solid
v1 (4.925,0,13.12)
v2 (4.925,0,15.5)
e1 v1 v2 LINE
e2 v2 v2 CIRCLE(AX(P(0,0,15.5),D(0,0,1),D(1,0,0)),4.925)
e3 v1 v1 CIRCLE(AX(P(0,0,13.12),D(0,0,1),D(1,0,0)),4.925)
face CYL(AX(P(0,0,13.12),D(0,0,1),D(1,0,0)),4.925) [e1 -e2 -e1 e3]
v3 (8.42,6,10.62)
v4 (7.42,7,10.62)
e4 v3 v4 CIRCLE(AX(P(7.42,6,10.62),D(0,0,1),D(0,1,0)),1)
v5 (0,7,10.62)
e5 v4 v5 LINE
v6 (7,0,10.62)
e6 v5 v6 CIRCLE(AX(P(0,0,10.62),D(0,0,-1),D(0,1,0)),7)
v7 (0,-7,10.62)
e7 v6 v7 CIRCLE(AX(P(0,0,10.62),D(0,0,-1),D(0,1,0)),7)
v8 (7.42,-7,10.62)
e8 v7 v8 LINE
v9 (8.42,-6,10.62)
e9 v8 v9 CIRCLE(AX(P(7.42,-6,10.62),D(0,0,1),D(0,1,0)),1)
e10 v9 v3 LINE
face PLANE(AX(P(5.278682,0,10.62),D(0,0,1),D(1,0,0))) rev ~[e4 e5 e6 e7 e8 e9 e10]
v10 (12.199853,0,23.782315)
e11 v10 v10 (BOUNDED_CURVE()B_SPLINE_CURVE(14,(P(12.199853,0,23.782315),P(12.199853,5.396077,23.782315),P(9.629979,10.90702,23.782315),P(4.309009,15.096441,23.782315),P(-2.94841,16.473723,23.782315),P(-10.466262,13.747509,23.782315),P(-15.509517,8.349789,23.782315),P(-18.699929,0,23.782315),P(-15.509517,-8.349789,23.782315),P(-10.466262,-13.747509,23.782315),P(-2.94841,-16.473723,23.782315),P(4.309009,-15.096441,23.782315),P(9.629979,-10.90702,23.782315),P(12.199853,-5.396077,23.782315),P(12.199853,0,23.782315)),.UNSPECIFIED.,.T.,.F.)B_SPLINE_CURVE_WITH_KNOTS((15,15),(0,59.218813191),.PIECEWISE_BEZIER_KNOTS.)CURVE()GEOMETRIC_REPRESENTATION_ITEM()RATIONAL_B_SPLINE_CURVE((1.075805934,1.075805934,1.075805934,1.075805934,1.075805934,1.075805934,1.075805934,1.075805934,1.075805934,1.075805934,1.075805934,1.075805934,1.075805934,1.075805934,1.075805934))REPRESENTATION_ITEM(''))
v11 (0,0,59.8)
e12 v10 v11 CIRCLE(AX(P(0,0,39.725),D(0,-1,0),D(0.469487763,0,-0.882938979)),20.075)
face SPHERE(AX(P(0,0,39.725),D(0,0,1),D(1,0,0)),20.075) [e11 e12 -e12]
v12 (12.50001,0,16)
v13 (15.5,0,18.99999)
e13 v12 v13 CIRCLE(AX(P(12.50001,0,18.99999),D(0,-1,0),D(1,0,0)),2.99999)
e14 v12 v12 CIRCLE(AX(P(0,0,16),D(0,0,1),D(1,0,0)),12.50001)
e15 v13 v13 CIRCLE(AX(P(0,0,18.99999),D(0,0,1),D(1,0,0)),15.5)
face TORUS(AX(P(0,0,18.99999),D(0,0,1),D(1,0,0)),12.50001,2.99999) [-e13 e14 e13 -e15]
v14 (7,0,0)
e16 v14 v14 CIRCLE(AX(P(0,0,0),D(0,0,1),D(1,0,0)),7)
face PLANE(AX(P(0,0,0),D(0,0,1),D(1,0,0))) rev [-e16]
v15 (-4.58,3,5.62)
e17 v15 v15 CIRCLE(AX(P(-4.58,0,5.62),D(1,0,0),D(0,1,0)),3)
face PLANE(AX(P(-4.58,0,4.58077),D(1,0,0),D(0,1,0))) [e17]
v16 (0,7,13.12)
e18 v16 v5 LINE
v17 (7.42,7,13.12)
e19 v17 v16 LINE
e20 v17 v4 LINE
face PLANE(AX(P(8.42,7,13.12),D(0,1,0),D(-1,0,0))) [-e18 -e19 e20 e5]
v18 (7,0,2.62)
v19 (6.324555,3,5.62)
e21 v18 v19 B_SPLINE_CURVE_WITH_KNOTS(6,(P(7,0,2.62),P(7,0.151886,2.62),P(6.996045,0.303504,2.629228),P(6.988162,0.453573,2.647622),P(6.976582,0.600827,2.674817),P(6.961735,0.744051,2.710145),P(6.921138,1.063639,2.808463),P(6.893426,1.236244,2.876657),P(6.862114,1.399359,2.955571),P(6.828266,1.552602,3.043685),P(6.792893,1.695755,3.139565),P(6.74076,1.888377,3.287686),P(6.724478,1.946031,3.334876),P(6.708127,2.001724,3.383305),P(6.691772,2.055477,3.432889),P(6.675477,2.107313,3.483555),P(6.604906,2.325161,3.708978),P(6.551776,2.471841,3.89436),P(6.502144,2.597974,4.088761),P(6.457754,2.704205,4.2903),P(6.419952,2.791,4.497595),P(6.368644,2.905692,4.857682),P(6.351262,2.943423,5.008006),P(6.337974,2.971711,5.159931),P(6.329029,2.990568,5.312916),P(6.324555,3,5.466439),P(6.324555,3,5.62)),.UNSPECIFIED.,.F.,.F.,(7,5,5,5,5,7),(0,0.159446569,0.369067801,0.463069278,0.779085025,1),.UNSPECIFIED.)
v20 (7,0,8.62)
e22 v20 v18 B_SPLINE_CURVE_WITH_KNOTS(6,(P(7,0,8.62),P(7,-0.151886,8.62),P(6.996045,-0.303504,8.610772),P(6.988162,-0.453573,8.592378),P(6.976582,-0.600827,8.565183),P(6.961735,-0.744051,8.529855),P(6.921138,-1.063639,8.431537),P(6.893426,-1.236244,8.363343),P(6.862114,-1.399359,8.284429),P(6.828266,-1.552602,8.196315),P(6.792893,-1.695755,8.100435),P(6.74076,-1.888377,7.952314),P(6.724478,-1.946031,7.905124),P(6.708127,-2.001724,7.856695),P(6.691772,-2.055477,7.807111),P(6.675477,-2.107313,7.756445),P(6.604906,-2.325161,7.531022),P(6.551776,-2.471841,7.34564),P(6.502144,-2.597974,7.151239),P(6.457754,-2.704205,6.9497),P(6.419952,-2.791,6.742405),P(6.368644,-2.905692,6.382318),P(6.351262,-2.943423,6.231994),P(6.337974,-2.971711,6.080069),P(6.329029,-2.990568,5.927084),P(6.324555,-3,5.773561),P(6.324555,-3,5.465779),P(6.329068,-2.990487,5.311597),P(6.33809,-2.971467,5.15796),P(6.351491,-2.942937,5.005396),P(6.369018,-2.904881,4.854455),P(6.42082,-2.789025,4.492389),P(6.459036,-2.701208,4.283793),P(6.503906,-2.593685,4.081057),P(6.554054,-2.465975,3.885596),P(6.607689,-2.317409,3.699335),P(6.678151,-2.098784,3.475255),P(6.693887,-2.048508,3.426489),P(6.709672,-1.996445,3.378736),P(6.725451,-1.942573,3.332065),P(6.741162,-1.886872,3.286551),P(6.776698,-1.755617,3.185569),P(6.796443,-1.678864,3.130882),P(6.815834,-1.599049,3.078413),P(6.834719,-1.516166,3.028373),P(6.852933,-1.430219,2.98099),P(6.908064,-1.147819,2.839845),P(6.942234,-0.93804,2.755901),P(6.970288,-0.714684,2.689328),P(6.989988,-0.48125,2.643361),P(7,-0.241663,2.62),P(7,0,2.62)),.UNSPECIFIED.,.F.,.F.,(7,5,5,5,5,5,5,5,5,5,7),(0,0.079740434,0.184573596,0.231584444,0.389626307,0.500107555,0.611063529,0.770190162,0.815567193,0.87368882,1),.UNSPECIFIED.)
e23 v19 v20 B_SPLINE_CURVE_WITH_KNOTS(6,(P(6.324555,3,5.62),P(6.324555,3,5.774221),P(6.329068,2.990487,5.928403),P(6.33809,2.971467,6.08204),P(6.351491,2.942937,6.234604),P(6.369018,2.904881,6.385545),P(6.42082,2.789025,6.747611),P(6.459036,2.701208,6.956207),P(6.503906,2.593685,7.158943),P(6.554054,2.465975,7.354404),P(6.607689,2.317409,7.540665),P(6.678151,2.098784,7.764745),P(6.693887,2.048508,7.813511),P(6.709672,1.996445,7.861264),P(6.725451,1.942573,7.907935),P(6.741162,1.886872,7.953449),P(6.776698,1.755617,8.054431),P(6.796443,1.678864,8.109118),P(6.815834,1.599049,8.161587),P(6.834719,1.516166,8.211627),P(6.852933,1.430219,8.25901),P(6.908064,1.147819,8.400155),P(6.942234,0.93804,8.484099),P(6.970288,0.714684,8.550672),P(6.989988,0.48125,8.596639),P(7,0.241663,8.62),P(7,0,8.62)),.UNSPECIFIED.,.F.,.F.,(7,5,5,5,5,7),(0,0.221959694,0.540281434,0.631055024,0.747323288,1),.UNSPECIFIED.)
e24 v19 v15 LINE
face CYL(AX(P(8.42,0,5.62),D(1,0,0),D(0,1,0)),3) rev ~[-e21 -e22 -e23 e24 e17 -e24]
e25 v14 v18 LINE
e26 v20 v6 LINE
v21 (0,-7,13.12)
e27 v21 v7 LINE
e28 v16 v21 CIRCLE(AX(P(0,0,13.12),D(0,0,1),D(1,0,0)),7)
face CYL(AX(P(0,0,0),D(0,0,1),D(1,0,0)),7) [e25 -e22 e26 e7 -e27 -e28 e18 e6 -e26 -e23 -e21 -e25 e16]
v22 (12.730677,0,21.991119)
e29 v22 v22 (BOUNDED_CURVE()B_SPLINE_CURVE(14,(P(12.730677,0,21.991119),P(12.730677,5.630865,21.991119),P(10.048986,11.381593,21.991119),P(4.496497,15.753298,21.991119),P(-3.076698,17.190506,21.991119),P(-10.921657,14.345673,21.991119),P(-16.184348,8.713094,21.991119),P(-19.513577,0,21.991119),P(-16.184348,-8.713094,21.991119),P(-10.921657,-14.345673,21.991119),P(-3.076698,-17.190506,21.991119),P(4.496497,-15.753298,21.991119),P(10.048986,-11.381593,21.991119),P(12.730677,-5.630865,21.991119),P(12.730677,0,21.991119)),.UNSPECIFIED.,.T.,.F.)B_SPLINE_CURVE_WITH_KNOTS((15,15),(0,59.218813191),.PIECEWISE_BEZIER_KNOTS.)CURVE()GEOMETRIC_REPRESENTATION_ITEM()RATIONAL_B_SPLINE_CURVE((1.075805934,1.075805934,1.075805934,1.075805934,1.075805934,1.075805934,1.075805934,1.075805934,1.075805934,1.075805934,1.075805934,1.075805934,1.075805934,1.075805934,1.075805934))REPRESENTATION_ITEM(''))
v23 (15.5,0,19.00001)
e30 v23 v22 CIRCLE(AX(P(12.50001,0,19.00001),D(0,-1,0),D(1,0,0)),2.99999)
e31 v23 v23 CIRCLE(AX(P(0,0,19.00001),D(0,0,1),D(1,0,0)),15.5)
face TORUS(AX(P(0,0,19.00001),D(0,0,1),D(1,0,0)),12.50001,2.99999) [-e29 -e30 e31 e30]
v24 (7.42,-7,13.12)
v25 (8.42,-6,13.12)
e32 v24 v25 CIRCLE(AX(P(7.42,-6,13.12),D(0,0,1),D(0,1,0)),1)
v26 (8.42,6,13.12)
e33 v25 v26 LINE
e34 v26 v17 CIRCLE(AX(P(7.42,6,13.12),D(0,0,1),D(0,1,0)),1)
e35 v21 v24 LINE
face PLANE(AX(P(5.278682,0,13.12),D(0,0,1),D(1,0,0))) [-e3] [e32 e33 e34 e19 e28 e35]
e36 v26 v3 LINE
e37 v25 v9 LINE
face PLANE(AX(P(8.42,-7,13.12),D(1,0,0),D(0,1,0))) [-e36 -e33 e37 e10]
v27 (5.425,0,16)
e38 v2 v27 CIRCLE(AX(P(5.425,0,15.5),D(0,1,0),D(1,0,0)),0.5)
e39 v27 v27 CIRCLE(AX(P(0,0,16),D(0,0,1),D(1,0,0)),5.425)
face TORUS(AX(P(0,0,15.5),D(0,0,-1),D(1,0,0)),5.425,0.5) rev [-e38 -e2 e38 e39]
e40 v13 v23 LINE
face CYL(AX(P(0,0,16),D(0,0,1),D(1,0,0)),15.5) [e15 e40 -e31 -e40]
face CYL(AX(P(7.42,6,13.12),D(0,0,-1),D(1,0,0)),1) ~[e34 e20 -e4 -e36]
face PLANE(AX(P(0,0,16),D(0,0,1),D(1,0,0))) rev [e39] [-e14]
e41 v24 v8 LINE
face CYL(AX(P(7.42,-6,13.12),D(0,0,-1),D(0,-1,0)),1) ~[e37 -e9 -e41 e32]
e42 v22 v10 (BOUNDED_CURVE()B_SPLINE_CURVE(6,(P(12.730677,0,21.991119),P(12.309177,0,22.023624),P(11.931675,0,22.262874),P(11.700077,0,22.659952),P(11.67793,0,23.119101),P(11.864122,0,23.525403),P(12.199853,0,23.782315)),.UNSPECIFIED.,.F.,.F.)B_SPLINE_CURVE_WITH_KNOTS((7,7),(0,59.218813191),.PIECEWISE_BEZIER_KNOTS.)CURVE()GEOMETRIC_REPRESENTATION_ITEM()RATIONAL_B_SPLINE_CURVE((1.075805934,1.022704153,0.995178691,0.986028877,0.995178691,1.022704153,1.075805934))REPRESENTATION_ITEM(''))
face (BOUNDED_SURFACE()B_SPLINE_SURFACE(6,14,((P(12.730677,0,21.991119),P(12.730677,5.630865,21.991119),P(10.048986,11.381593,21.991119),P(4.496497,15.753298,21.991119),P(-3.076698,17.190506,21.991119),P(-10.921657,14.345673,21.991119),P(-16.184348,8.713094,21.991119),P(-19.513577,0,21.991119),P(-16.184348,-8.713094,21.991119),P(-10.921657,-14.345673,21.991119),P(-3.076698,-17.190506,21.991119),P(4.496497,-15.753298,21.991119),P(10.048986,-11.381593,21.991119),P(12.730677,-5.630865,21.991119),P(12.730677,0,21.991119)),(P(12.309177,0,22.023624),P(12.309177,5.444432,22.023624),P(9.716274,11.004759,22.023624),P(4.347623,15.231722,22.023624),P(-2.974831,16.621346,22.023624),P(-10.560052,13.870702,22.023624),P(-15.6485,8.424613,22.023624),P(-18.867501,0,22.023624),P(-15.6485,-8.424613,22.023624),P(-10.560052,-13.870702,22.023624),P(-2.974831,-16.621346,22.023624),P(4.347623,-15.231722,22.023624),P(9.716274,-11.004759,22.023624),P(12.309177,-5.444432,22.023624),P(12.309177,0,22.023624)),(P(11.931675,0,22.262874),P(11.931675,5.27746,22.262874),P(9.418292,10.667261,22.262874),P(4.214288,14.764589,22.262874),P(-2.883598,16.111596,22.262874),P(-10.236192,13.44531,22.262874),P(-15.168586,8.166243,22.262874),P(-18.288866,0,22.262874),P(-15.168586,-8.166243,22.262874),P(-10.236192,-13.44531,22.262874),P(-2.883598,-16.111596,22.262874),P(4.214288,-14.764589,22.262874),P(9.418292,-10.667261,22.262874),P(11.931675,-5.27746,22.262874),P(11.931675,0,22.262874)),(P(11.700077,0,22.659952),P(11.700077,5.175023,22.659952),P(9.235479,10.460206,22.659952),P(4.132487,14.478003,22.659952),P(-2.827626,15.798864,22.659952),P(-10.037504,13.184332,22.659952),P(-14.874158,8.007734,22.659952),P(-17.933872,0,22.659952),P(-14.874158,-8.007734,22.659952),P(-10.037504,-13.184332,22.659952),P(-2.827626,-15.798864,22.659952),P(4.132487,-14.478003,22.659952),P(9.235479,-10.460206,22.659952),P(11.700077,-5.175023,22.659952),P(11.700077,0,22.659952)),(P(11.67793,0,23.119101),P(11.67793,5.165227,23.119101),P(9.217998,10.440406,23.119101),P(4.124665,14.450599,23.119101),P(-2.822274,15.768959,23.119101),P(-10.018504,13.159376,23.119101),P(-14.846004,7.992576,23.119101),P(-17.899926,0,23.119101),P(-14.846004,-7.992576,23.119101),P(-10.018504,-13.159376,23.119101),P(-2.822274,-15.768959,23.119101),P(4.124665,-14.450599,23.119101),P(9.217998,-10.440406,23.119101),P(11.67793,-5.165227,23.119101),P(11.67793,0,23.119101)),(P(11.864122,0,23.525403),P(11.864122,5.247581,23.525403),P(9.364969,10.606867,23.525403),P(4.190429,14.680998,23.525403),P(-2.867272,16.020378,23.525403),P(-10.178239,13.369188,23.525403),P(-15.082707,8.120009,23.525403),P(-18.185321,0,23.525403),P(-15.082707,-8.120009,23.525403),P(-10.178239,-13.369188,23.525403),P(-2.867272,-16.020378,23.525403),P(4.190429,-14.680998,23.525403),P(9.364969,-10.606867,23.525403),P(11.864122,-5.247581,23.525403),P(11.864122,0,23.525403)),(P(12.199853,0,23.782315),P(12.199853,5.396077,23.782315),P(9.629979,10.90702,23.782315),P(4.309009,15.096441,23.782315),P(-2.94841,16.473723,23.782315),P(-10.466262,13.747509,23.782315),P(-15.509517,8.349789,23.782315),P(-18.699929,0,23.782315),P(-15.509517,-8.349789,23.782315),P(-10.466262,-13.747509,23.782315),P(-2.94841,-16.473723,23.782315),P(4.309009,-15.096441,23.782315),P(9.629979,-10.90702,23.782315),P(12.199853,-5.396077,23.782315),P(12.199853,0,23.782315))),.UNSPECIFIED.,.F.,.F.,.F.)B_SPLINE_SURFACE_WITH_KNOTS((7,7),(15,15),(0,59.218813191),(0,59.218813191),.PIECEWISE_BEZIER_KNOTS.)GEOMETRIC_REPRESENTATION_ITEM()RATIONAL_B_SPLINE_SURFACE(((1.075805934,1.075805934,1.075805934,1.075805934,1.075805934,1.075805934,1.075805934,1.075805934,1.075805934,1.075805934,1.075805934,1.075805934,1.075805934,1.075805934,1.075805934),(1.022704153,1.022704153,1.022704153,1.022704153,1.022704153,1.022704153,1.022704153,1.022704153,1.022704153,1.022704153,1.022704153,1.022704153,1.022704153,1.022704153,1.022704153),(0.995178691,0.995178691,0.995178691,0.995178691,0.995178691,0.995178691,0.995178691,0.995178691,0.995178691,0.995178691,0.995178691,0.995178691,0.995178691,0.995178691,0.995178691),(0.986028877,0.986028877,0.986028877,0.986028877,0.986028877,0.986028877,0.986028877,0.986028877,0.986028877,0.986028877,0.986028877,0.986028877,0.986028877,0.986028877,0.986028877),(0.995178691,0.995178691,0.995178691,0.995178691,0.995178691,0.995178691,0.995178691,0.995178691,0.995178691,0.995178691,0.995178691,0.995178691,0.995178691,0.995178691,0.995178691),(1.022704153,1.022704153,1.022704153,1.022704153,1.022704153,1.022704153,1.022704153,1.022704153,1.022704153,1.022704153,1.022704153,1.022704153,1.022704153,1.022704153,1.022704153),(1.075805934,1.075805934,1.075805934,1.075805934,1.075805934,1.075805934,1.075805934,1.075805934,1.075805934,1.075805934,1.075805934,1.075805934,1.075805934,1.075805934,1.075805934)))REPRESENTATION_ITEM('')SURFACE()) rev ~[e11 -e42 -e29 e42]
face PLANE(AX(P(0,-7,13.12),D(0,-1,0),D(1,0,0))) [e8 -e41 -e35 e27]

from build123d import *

# Parameters (mm, degrees)
F3_DEPTH = 2.5
F5_DEPTH = 13
F6_R     = 2.99999
F7_R     = 1
F8_R     = 1
F9_R     = 0.5


# Not quite as in the source:
# - a fillet or chamfer is up to 0.001 mm smaller than in the source, because OpenCascade refuses the exact size


with BuildPart() as f1:
    # F0 (on Front) → F1 (revolve)
    with BuildSketch(Plane.XZ):
        with BuildLine():
            Line((0, 59.8), (0, 0))
            Line((0, 0), (7, 0))
            Line((7, 0), (7, 13.12))
            Line((7, 13.12), (4.925, 13.12))
            Line((4.925, 13.12), (4.925, 16))
            Line((4.925, 16), (15.5, 16))
            Line((15.5, 16), (15.5, 22))
            Line((15.5, 22), (9.4249668434, 22))
            ThreePointArc((9.4249668434, 22), (19.4786421498, 44.5817607518), (0, 59.8))
        make_face()
    revolve(axis=Axis((0, 0, 29.9), (0, 0, 1)))

    # F2 (on face) → F3 (join)
    with BuildSketch(Plane.XY.offset(13.12)):
        with BuildLine():
            ThreePointArc((0, 7), (7, 0), (0, -7))
            Line((0, -7), (8.42, -7))
            Line((8.42, -7), (8.42, 7))
            Line((8.42, 7), (0, 7))
        make_face()
    extrude(amount=-F3_DEPTH)

    # F4 (on face) → F5 (cut)
    with BuildSketch(Plane.YZ.offset(8.42)):
        with BuildLine():
            ThreePointArc((-3, 5.62), (0, 2.62), (3, 5.62))
            Line((3, 5.62), (-3, 5.62))
        make_face()
        with BuildLine():
            Line((-3, 5.62), (3, 5.62))
            ThreePointArc((3, 5.62), (0, 8.62), (-3, 5.62))
        make_face()
    extrude(amount=-F5_DEPTH, mode=Mode.SUBTRACT)

    # F6 (radius 3 in the source; OpenCascade refuses exactly that, so slightly less here)
    f6_edges = [f1.edges().sort_by_distance(p)[0] for p in [
        (-15.5, 0, 22),
        (-15.5, 0, 16),
    ]]
    fillet(f6_edges, radius=F6_R)

    # F7
    f7_edges = [f1.edges().sort_by_distance(p)[0] for p in [
        (-9.424967, 0, 22),
    ]]
    fillet(f7_edges, radius=F7_R)

    # F8
    f8_edges = [f1.edges().sort_by_distance(p)[0] for p in [
        (8.42, -7, 11.87),
        (8.42, 7, 11.87),
    ]]
    fillet(f8_edges, radius=F8_R)

    # F9
    f9_edges = [f1.edges().sort_by_distance(p)[0] for p in [
        (-4.925, 0, 16),
    ]]
    fillet(f9_edges, radius=F9_R)


solid = f1.part
